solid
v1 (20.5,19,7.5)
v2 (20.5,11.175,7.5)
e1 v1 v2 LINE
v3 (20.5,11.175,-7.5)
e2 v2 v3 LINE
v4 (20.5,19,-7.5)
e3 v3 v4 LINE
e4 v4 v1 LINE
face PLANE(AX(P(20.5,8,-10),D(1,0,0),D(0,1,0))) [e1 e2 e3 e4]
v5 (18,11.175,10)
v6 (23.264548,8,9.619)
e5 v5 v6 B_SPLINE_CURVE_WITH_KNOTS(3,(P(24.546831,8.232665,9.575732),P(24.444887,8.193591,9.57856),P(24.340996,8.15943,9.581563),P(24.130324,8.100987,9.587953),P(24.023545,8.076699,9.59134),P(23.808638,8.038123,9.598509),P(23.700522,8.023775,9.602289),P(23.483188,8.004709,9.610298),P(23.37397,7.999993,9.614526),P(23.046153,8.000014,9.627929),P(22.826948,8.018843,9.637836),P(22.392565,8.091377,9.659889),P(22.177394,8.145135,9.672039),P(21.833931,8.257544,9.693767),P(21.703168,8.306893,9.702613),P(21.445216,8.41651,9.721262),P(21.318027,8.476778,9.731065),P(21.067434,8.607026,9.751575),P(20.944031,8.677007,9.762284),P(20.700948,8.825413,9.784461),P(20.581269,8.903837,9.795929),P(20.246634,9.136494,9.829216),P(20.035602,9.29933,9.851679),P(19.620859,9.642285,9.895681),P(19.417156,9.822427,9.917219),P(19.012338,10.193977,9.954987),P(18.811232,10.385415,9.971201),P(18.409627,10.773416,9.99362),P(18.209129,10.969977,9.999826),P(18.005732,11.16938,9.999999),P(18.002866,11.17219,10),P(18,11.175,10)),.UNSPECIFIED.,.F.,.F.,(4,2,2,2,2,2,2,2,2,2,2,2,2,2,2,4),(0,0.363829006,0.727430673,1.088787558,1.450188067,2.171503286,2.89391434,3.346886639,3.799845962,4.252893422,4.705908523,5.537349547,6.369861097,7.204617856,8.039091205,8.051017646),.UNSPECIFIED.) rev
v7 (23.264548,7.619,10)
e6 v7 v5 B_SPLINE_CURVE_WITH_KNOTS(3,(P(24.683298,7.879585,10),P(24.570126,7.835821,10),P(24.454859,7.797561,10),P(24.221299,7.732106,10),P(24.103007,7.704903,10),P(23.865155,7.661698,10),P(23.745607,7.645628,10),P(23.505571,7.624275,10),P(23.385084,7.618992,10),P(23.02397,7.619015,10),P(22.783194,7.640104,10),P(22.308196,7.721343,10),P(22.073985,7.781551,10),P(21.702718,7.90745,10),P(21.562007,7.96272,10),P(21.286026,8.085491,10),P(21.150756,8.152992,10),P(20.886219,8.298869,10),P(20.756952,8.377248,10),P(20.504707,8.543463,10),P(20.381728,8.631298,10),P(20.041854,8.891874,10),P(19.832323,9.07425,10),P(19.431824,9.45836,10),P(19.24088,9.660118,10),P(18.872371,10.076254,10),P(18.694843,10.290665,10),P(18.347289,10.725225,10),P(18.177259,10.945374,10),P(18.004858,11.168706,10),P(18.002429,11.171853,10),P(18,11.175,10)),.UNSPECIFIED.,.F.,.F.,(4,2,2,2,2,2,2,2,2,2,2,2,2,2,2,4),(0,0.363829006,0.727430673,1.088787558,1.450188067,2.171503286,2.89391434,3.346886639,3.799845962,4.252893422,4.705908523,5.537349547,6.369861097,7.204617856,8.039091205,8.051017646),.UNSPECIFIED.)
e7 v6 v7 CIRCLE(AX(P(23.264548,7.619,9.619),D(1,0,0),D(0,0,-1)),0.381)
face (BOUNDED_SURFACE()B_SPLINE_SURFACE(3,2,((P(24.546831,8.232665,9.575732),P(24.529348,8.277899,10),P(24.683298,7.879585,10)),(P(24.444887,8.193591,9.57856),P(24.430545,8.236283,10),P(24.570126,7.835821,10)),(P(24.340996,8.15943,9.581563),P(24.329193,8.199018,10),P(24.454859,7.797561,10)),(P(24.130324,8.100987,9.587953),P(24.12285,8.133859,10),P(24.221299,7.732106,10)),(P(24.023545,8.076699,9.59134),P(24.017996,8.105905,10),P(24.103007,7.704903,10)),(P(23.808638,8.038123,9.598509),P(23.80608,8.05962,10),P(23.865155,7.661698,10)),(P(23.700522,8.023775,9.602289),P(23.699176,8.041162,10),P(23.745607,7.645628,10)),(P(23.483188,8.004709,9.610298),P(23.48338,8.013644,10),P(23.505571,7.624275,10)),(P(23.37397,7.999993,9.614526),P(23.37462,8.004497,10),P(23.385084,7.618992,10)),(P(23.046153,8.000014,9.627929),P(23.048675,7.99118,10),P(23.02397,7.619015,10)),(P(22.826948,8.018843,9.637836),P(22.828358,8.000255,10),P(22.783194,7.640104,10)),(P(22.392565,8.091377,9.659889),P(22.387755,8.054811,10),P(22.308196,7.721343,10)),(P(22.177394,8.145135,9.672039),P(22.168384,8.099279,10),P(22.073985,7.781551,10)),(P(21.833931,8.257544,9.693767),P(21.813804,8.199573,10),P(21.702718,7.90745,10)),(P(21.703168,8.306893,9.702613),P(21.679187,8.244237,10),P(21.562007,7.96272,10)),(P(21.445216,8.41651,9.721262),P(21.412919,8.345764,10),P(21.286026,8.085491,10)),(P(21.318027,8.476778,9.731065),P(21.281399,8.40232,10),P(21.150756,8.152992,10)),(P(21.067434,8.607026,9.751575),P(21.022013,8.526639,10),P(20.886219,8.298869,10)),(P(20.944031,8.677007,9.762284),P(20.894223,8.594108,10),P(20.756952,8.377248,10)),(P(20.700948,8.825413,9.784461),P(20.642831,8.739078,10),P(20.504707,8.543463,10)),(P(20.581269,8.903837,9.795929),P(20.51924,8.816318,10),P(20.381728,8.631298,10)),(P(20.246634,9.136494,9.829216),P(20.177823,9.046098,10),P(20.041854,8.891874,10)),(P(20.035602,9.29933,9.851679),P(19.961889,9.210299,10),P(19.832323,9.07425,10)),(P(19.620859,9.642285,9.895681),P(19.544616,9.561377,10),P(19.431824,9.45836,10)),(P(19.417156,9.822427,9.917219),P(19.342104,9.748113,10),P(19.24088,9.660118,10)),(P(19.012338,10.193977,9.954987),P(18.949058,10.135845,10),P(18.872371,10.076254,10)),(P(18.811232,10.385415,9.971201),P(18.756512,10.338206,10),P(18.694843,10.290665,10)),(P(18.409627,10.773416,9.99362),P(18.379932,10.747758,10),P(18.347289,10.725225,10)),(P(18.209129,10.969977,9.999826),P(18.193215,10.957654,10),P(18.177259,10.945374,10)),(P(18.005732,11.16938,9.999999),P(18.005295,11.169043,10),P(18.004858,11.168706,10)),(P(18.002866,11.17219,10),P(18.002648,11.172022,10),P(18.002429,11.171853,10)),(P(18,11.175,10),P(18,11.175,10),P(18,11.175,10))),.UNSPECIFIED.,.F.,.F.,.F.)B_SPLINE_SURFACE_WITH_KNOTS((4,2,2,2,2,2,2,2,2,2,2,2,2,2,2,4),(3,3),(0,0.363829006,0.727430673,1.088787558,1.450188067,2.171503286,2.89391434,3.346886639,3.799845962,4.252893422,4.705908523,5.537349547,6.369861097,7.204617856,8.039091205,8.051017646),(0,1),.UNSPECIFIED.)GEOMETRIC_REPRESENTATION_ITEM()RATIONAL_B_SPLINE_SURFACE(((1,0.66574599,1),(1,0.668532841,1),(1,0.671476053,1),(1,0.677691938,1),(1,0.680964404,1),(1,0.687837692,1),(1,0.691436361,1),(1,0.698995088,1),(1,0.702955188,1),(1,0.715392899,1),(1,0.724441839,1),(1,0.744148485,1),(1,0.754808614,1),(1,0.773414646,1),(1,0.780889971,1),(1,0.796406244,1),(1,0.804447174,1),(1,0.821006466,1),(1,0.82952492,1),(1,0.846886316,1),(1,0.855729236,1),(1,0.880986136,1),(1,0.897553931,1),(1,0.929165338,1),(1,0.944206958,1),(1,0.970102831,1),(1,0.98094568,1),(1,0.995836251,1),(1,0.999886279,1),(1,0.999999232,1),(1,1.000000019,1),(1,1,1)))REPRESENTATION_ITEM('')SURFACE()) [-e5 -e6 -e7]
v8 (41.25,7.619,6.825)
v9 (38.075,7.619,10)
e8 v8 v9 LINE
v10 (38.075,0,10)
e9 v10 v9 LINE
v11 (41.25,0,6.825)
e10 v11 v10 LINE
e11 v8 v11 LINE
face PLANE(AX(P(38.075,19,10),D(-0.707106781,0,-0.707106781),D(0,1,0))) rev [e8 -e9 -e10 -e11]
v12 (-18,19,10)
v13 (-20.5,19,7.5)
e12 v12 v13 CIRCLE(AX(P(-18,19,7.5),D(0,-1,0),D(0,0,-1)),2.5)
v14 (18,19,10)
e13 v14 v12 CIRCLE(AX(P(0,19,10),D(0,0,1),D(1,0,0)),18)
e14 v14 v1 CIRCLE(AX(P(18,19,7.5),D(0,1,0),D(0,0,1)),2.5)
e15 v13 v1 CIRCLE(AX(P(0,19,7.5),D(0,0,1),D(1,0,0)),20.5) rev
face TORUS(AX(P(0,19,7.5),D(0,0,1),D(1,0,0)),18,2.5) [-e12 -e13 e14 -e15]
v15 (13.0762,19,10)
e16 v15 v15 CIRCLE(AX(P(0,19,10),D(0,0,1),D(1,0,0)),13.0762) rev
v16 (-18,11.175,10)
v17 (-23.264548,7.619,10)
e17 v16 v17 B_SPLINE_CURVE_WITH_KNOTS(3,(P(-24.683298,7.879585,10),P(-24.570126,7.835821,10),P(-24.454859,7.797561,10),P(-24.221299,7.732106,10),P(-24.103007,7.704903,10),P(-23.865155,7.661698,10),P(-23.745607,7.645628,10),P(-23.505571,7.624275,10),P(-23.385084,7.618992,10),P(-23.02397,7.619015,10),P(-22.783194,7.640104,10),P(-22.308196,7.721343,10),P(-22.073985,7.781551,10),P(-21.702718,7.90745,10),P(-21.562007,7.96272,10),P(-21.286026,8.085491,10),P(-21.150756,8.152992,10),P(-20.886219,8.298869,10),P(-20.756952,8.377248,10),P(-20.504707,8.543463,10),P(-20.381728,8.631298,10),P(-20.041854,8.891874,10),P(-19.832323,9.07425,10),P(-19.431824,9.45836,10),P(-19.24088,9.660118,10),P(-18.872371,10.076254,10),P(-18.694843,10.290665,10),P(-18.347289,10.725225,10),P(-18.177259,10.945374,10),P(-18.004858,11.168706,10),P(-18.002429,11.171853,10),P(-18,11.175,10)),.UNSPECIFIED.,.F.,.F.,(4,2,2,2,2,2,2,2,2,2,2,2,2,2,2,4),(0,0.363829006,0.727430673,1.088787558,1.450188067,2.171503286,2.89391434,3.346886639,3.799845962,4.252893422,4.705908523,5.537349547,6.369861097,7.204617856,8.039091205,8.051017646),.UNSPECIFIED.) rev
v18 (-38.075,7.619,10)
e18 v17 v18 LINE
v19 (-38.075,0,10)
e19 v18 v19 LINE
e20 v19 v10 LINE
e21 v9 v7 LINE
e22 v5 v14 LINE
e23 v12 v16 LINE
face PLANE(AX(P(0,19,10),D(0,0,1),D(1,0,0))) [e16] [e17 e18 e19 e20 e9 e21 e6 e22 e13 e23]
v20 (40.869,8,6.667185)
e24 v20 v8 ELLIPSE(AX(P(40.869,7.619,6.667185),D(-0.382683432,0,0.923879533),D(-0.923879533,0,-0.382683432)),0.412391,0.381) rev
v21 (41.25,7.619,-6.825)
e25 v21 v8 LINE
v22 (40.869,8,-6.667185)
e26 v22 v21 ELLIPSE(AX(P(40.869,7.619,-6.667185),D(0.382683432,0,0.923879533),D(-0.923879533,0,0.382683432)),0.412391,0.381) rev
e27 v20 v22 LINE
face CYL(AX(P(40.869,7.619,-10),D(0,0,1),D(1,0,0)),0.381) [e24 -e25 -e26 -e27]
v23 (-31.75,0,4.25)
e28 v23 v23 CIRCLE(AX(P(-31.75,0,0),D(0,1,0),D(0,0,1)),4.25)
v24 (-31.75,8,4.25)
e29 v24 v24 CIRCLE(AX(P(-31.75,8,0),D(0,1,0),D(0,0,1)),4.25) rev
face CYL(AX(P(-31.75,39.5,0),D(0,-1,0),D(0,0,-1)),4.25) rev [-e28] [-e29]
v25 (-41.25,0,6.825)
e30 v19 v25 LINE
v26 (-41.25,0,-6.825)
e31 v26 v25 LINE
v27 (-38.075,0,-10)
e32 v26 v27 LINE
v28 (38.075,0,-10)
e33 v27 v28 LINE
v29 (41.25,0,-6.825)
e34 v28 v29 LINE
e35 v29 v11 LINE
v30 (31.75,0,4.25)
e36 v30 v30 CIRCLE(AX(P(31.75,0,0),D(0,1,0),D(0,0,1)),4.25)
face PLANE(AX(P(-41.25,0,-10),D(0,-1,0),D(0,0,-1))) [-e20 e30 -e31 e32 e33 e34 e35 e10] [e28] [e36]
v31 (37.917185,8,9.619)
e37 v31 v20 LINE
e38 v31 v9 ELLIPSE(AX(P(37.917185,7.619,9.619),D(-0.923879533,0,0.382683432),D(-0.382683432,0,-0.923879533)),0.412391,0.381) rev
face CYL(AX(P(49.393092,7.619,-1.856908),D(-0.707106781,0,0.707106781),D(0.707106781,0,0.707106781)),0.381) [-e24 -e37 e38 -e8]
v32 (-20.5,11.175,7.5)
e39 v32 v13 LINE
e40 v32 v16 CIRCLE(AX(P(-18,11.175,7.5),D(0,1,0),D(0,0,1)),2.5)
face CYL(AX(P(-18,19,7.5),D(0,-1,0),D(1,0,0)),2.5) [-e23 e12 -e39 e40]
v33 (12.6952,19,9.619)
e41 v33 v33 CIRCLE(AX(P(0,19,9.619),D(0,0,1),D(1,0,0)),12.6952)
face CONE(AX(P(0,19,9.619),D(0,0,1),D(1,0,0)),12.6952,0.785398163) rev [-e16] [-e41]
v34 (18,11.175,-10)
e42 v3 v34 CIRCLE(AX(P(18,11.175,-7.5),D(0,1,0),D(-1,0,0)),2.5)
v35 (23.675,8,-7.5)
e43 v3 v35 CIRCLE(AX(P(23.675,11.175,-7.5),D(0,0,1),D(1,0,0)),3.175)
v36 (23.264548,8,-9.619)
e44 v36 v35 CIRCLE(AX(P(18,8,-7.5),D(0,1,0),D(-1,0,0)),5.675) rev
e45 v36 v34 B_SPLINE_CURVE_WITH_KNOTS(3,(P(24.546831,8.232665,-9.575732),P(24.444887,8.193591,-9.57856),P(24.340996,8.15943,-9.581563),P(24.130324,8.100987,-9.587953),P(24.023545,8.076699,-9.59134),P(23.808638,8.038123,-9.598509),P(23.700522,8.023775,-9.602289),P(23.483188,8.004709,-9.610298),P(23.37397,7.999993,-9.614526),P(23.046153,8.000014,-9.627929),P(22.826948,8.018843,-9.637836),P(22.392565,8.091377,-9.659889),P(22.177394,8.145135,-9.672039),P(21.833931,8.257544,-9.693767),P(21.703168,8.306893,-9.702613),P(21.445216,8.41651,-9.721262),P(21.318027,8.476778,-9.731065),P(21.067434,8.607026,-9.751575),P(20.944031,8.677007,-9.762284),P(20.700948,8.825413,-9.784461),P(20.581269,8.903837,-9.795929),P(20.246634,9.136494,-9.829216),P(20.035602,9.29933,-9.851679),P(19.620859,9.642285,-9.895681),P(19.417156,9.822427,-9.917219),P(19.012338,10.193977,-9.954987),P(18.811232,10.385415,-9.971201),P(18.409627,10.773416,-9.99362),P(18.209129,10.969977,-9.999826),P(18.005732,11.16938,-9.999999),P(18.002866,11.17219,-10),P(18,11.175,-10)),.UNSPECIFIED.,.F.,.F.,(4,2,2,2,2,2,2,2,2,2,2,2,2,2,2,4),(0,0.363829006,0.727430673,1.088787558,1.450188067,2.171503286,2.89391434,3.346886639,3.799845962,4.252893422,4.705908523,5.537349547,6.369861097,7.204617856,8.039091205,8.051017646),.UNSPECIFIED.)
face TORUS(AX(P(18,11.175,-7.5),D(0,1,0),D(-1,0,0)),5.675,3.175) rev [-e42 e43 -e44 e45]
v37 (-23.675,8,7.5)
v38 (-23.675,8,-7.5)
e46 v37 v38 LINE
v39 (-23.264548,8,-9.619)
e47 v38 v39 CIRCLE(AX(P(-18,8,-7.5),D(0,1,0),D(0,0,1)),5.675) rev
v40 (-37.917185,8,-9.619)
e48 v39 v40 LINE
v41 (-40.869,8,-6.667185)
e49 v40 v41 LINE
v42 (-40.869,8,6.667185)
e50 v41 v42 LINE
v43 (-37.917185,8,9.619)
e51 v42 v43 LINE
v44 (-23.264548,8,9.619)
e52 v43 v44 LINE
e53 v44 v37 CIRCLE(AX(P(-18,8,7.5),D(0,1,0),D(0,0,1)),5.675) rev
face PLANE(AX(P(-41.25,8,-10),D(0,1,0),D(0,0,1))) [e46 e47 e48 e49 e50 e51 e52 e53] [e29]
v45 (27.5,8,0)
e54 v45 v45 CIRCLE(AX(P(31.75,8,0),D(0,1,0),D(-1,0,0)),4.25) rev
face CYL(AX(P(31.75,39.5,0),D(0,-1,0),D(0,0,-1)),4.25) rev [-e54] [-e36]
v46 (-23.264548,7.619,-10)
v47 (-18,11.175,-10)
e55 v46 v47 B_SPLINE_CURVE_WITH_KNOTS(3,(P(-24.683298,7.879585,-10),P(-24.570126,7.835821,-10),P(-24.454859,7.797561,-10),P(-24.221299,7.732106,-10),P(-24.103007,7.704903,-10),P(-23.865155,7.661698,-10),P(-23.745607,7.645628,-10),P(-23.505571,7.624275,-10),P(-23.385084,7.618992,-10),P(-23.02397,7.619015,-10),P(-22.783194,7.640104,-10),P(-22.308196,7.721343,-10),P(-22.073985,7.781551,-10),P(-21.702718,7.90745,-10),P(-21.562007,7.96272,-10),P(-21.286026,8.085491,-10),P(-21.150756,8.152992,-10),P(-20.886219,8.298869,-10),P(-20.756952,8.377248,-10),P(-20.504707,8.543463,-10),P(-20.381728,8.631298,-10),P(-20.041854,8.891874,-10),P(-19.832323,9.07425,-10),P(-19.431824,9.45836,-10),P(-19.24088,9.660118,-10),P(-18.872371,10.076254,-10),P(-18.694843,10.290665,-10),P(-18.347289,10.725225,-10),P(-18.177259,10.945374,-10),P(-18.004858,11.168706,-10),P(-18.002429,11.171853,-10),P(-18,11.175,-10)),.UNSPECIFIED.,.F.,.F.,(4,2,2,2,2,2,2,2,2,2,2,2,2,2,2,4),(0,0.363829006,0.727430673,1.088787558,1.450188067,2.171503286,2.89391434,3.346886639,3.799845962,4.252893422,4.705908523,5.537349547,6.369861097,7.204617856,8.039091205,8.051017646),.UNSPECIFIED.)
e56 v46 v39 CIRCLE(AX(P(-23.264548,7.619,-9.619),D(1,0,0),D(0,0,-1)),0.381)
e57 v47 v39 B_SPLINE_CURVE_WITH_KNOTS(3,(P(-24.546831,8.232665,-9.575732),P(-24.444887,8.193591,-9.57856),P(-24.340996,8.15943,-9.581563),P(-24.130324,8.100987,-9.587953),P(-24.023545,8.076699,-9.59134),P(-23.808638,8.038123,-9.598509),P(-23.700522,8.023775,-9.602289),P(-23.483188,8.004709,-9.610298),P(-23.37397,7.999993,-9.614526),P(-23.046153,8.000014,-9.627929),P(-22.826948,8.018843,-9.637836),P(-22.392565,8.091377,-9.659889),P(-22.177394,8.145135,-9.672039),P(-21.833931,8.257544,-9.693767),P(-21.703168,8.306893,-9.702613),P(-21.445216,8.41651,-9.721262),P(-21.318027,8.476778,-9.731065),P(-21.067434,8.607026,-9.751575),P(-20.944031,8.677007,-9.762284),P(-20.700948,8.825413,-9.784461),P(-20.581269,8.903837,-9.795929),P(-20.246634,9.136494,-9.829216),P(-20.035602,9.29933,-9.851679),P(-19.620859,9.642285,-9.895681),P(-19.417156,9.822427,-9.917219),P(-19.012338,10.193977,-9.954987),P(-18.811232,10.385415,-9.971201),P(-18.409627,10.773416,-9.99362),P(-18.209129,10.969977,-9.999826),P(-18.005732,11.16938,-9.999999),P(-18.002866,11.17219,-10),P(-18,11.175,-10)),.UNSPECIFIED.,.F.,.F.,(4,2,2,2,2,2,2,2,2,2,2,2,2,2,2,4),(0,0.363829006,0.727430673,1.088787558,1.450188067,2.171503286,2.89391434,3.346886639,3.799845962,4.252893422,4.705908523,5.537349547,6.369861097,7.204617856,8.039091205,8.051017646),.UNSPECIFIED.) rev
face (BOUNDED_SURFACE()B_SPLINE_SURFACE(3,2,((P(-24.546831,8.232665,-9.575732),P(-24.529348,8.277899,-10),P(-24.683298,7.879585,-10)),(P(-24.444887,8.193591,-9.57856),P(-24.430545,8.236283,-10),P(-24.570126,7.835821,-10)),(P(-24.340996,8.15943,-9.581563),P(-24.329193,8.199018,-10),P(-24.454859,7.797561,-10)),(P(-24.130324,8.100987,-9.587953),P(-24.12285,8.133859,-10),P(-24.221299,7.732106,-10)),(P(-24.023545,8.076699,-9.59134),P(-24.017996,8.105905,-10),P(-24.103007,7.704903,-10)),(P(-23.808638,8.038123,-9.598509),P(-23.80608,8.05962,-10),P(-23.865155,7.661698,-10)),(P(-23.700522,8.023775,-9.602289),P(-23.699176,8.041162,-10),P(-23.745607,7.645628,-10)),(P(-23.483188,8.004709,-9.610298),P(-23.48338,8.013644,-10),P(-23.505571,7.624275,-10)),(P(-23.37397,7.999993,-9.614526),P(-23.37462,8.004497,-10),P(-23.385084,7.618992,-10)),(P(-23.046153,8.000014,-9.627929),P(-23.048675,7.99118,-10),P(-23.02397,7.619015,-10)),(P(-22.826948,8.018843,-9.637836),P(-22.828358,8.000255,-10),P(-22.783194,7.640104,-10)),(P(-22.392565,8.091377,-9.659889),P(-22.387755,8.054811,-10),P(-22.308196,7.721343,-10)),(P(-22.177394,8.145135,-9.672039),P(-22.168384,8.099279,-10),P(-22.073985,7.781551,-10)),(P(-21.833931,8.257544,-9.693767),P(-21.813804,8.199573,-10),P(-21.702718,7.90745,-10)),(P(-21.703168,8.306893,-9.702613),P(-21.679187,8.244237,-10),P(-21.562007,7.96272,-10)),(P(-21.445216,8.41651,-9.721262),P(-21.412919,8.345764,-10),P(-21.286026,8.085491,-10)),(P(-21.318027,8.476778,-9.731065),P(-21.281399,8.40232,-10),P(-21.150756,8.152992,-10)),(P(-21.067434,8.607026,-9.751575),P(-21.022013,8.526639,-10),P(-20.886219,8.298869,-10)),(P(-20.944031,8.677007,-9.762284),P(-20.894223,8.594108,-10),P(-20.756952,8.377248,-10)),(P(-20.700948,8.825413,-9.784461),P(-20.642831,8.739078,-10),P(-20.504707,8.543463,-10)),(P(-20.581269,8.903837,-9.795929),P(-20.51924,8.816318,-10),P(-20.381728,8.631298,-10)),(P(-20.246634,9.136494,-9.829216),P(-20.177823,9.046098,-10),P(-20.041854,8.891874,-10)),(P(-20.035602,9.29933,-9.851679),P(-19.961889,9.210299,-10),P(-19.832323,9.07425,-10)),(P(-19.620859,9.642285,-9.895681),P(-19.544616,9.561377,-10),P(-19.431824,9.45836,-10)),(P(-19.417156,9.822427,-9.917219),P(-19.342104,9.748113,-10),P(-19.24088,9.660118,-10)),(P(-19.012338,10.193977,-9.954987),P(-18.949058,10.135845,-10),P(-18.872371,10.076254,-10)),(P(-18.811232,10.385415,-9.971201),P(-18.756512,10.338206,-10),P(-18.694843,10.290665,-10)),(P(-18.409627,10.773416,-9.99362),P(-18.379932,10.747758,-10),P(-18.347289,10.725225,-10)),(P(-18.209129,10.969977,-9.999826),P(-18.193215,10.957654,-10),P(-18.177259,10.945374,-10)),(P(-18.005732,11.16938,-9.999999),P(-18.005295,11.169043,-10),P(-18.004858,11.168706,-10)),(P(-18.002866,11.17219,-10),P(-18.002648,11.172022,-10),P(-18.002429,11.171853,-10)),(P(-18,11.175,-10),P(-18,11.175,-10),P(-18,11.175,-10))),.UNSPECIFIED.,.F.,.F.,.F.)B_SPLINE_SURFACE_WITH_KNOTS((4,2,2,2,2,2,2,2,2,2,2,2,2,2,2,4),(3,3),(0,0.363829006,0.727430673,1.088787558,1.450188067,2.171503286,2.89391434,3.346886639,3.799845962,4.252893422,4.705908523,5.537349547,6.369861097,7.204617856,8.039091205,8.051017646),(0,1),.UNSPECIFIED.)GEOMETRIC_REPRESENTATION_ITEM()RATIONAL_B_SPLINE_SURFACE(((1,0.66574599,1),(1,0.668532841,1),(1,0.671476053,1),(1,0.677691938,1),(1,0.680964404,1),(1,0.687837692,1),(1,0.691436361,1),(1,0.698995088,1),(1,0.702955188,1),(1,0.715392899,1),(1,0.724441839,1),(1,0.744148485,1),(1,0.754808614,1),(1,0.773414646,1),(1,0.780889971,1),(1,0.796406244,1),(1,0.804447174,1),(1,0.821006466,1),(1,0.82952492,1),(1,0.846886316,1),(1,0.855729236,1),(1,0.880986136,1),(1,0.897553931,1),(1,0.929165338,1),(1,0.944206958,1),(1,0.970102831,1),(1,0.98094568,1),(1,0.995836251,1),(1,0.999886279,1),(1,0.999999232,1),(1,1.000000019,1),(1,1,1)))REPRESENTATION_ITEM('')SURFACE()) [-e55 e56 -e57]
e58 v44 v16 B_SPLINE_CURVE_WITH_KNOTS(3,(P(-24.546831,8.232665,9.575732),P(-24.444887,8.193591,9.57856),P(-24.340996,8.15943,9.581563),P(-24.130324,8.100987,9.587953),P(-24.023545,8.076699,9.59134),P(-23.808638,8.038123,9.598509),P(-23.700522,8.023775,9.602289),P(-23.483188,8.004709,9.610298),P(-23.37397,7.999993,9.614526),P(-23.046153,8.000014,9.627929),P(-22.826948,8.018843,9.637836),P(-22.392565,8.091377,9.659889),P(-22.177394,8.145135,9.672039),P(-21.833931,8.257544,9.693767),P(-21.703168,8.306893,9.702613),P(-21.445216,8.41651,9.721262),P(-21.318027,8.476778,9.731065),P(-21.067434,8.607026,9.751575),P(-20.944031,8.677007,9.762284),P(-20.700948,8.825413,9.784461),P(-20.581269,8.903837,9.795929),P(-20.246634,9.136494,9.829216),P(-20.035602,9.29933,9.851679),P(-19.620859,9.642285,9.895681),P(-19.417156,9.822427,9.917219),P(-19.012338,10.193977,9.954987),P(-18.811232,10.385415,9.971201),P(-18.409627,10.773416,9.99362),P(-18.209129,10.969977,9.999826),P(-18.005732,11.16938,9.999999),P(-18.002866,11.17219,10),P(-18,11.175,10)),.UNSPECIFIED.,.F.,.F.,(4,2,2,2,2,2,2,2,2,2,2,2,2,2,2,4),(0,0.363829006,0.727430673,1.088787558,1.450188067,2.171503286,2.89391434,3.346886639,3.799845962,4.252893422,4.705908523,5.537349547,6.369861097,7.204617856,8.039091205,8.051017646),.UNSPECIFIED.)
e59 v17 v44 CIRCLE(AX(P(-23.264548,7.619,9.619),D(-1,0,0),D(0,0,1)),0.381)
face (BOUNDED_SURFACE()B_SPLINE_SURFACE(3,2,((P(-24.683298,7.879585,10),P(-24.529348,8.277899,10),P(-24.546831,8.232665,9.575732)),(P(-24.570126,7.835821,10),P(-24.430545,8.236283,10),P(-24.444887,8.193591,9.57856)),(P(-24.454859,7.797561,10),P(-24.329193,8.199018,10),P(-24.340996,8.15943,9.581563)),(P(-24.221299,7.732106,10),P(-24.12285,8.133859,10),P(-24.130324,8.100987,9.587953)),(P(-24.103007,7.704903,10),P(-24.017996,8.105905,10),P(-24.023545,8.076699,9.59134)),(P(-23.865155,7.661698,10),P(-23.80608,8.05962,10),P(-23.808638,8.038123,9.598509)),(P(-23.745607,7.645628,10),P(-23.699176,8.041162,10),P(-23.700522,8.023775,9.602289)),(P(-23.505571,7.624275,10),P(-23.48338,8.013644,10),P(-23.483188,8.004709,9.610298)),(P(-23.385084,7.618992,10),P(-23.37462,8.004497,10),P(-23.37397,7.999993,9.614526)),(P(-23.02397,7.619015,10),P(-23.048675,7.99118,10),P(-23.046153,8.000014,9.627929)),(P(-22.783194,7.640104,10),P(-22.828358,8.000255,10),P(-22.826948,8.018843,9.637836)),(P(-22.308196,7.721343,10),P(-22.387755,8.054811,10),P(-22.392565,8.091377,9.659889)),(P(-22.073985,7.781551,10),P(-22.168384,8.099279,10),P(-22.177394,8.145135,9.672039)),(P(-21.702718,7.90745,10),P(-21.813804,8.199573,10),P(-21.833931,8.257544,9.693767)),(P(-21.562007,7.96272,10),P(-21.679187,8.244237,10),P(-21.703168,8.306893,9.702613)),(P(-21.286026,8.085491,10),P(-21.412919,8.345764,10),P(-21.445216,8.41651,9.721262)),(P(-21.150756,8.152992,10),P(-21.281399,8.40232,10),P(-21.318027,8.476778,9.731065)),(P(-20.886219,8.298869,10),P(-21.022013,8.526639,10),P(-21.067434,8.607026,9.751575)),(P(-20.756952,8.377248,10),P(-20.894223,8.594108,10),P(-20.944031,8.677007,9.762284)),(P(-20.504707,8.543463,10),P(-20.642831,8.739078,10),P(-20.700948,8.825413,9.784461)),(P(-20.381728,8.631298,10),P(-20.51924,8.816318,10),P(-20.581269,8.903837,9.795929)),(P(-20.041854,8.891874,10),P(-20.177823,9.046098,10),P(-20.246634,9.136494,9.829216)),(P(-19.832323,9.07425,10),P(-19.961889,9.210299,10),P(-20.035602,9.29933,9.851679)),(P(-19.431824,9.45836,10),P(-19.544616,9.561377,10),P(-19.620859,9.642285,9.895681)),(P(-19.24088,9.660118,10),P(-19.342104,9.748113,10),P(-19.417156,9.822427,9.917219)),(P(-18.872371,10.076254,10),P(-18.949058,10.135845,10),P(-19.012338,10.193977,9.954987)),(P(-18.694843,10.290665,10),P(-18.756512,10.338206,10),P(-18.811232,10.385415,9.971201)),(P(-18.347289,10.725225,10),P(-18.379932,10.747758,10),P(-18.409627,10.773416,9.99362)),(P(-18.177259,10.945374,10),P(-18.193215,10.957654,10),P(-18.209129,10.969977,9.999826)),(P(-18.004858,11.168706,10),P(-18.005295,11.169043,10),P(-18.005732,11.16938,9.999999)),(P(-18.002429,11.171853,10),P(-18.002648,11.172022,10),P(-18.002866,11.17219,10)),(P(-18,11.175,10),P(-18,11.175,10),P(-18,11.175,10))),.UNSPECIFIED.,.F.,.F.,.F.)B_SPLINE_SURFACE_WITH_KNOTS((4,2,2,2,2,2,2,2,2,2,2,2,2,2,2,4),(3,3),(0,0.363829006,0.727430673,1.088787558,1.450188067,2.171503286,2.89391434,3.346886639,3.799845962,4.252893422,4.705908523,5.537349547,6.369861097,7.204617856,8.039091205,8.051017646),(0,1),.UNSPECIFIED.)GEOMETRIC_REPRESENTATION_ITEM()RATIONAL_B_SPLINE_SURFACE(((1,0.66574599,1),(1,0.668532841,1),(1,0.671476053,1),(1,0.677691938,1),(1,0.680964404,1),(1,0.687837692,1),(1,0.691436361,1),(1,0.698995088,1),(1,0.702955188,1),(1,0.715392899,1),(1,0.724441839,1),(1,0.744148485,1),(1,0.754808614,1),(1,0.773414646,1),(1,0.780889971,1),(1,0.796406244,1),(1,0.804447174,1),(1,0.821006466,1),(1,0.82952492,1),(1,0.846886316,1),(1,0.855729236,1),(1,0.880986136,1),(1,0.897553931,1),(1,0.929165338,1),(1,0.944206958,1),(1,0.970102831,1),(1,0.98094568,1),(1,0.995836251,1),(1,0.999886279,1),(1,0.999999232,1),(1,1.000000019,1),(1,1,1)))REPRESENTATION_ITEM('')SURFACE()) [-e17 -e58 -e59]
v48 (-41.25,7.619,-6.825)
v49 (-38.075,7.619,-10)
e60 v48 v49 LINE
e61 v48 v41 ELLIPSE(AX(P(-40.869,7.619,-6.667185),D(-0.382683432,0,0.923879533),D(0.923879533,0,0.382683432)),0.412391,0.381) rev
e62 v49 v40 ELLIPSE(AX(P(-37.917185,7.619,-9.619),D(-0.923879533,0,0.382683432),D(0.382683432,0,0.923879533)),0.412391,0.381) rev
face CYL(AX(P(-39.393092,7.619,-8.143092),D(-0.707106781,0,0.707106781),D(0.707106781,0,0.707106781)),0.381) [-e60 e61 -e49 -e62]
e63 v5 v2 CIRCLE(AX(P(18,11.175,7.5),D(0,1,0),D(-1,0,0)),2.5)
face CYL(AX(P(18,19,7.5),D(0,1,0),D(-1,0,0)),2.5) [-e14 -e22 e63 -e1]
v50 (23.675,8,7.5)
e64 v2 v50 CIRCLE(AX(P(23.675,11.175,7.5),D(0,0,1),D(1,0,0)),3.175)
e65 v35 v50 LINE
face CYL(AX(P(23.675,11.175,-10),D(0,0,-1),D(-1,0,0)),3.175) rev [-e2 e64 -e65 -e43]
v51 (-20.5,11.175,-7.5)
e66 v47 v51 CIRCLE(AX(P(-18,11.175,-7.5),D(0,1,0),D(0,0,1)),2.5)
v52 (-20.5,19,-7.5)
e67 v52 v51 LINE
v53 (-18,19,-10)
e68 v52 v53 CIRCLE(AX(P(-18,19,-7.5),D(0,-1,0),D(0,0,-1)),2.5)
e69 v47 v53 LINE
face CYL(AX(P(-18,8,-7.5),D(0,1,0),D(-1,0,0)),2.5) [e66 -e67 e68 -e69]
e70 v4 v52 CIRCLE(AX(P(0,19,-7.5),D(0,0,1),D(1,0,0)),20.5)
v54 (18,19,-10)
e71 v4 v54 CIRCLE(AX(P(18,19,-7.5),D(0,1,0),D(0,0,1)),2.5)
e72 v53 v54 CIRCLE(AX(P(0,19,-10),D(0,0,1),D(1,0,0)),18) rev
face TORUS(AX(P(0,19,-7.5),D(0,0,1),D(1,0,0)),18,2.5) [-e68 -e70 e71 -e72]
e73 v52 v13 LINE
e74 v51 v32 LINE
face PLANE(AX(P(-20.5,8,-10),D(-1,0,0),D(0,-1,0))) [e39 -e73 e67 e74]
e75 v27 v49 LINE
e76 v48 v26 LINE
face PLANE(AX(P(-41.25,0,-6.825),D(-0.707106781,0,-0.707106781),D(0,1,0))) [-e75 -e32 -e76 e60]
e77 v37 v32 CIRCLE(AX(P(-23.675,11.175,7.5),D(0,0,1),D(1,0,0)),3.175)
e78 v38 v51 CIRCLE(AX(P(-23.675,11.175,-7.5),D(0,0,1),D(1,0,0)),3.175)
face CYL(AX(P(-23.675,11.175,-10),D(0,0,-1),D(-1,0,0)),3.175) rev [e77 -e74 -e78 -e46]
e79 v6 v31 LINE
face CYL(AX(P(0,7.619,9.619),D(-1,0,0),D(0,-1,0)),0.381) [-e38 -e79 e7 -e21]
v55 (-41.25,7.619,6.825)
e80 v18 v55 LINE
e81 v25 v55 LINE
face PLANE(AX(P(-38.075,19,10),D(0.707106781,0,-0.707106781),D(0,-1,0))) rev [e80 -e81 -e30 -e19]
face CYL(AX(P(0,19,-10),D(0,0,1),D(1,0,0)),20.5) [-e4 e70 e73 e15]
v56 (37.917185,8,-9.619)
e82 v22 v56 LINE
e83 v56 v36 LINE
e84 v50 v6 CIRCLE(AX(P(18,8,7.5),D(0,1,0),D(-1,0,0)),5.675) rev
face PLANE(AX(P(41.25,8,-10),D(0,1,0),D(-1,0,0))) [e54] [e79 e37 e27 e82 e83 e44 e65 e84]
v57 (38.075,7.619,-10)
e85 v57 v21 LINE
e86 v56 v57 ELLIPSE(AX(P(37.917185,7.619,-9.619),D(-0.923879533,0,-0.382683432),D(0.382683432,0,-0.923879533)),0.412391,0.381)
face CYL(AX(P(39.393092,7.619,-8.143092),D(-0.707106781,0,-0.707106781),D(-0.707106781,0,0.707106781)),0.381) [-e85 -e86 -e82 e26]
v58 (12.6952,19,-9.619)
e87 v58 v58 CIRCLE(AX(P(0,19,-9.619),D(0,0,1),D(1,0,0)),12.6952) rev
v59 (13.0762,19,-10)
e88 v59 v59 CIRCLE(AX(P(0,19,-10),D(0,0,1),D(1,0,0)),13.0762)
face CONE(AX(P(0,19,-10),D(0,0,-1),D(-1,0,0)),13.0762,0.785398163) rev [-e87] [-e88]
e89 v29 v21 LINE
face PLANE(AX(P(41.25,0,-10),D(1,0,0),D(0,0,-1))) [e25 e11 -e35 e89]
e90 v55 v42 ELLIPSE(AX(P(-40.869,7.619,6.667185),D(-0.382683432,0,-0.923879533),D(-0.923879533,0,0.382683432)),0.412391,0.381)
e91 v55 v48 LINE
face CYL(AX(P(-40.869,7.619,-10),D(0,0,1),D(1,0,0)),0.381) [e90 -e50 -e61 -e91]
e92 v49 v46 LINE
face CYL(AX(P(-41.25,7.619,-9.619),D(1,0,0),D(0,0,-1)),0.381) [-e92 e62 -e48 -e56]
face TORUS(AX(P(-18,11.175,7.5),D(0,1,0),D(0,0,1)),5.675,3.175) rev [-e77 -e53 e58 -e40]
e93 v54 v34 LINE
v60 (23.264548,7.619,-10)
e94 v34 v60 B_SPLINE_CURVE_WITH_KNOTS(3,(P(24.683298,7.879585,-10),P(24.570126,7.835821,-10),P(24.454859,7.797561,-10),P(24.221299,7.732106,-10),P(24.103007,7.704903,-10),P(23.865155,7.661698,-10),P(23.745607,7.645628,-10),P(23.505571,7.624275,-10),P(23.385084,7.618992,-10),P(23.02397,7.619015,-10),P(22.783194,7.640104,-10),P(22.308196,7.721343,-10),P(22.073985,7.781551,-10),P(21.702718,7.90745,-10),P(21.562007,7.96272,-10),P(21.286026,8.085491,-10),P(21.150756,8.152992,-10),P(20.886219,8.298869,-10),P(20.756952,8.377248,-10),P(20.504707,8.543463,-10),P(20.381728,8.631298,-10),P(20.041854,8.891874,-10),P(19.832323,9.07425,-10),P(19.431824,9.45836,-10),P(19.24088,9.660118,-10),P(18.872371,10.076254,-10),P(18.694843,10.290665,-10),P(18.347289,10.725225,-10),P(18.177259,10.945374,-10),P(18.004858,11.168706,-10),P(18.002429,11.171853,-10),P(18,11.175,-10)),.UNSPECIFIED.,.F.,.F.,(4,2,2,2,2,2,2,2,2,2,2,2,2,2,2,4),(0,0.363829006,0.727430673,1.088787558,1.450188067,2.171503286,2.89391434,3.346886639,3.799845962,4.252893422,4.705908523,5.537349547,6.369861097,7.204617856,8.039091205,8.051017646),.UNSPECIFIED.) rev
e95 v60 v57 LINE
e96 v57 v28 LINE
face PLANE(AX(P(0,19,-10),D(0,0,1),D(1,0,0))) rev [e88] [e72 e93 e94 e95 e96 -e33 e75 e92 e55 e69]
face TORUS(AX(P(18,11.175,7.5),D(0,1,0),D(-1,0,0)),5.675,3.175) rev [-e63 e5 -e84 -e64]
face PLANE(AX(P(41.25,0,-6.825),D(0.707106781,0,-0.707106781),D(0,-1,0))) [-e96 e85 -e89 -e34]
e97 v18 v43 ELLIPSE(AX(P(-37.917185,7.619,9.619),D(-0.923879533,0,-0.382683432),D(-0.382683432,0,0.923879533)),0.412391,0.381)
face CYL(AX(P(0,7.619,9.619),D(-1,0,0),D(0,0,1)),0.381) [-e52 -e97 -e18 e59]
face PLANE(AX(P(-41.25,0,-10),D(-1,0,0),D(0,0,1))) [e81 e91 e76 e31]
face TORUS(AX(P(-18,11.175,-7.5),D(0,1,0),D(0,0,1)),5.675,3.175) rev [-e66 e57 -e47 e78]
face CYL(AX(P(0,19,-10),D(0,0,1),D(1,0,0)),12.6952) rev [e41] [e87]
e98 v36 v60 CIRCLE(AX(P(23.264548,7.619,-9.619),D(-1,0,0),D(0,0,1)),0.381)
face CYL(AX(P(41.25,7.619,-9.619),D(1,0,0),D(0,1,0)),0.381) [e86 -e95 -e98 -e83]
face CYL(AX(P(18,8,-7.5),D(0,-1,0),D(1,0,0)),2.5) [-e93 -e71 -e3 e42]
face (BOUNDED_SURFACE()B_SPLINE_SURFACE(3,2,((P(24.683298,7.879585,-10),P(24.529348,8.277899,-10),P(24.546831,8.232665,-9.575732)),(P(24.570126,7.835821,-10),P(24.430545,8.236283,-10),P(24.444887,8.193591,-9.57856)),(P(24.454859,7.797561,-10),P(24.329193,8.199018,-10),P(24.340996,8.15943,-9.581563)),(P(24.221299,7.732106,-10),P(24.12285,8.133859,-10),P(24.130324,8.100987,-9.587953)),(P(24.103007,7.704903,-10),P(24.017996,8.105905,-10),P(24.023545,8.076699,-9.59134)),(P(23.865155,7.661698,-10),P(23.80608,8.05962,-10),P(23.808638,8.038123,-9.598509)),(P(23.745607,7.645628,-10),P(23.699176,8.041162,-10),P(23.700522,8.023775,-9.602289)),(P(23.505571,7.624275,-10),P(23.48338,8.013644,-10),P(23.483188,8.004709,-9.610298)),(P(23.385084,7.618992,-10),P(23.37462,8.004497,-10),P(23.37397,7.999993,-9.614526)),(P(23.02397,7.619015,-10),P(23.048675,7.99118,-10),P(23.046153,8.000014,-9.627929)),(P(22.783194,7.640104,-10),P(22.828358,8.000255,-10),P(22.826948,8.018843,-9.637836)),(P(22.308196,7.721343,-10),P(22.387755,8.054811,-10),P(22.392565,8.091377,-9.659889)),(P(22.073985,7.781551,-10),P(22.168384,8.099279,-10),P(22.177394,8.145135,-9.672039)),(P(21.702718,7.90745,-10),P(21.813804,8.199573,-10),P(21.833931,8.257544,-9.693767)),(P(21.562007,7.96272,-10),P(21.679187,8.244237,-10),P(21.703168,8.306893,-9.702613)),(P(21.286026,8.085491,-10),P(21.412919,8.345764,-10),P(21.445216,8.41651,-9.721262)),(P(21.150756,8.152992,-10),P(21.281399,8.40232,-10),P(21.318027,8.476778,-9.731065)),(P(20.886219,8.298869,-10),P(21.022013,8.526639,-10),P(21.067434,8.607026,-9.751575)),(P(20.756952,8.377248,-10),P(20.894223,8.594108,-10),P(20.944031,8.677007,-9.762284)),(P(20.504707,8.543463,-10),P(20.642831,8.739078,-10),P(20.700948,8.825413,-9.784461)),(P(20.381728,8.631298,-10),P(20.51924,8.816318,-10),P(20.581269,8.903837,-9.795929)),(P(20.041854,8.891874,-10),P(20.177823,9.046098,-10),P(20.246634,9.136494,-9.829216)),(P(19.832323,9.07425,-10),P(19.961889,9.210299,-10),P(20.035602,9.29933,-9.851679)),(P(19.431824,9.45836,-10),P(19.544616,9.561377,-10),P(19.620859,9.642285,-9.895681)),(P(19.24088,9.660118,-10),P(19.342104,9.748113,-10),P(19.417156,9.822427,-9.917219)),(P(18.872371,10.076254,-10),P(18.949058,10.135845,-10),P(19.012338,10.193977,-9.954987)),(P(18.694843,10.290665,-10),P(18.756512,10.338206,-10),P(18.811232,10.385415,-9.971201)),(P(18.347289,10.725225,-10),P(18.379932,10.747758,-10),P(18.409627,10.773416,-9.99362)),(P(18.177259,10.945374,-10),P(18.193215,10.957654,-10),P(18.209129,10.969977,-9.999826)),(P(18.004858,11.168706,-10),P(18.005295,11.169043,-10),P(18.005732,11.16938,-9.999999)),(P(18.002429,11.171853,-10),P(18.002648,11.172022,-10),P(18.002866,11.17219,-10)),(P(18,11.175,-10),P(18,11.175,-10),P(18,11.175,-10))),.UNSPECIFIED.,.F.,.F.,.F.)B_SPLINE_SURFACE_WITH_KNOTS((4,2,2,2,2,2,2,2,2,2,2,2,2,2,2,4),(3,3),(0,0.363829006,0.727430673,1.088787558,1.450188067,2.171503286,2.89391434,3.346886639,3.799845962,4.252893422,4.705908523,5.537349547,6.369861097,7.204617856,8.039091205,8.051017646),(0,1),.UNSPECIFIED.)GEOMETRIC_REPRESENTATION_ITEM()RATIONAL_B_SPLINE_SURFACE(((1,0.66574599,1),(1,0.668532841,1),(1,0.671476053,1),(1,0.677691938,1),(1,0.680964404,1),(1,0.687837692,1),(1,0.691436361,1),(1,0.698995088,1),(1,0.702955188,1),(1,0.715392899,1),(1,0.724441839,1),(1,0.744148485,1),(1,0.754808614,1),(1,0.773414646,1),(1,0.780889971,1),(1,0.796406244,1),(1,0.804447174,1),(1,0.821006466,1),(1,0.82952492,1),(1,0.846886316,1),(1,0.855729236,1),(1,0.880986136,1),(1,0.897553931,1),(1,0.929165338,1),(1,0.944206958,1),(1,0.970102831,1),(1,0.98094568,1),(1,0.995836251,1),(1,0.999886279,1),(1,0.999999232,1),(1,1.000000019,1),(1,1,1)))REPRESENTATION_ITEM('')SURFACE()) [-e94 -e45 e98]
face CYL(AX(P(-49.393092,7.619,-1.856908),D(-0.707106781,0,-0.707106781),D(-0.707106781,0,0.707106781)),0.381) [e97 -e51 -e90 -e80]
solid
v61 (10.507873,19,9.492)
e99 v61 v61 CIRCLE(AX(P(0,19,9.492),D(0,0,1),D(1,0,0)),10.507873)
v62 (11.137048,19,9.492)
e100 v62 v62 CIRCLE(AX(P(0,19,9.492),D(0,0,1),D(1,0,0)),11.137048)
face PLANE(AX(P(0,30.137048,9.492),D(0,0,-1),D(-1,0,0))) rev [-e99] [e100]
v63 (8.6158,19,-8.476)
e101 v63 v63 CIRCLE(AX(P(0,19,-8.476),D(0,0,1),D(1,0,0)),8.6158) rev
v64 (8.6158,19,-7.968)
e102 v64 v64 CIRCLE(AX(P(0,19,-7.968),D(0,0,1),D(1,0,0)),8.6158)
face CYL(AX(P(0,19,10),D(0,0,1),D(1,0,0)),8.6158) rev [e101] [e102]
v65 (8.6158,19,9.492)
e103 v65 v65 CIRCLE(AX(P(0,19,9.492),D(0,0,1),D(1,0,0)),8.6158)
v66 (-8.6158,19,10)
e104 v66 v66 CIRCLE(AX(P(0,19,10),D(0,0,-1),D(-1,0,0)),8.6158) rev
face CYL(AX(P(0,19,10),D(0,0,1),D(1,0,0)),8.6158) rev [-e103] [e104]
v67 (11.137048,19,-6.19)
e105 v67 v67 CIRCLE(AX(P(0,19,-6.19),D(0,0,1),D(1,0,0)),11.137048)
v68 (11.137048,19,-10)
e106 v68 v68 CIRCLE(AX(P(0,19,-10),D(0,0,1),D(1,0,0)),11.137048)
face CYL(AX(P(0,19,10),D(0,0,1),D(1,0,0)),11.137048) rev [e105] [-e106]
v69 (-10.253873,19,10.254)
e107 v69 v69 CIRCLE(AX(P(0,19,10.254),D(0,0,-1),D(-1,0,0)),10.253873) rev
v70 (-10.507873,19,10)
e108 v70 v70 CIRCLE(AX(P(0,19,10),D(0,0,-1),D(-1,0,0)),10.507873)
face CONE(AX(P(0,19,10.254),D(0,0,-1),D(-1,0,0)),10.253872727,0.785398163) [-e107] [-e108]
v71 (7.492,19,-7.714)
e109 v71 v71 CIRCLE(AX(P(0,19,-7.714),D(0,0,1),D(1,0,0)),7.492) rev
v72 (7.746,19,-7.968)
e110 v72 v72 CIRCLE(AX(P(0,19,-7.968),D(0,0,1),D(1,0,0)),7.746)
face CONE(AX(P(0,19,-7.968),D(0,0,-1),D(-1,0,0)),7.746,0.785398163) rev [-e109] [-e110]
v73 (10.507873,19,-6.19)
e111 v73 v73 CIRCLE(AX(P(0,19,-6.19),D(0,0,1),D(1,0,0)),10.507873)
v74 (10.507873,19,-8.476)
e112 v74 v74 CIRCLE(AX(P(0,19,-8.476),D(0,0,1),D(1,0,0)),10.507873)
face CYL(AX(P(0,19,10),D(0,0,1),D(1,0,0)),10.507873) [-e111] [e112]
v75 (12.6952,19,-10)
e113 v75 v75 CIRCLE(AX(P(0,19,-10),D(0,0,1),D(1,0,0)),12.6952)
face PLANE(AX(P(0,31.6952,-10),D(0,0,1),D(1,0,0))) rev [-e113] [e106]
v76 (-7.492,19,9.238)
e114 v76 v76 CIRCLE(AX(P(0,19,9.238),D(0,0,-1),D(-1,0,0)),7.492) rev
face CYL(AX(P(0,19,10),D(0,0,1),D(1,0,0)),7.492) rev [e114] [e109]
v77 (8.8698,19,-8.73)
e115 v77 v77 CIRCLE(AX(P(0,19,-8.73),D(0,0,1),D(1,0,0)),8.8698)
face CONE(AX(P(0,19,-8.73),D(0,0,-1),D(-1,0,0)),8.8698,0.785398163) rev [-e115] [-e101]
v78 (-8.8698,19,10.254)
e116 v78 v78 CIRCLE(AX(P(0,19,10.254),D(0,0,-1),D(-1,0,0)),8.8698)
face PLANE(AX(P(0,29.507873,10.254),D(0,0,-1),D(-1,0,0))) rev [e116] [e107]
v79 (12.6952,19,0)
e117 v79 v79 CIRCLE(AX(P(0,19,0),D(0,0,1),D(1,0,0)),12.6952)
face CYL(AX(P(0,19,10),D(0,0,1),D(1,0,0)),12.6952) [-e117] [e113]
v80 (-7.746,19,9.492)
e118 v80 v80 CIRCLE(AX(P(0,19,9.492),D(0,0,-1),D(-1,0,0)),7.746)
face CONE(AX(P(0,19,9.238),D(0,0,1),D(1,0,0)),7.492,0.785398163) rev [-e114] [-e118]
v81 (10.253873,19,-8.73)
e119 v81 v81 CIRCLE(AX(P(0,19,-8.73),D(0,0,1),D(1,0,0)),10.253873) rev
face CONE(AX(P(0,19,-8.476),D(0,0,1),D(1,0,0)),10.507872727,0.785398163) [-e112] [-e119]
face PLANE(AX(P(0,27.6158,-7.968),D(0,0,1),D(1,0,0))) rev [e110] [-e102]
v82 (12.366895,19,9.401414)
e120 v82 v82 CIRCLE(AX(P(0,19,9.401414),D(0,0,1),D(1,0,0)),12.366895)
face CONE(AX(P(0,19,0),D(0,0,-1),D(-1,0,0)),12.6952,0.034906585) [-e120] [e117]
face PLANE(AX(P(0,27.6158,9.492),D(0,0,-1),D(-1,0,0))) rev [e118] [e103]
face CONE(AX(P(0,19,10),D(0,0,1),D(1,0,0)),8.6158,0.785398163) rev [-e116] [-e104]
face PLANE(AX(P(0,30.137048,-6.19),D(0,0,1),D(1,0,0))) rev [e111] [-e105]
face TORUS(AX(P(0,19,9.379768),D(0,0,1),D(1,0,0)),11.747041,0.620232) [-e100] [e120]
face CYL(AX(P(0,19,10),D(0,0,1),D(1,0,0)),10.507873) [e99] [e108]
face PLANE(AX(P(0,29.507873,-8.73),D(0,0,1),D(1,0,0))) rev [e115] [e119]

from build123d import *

# Parameters (mm, degrees)
BOSS_EXTRUDE1_DEPTH      = 10
BOSS_EXTRUDE1_DEPTH_BACK = 10
SKETCH3_R                = 12.6952
SKETCH4_R                = 4.25
CUT_EXTRUDE1_DEPTH       = 58.981139175
CHAMFER1_SIZE            = 3.175
FILLET1_R                = 2.5
FILLET2_R                = 3.175
CHAMFER2_SIZE            = 0.381
FILLET3_R                = 0.381
CHAMFER3_SIZE            = 0.254


with BuildPart() as part:
    # Sketch3 → Boss-Extrude1 (new, two sides: drawn at the far end of the back side and taken through both)
    with BuildSketch(Plane.XY.offset(-BOSS_EXTRUDE1_DEPTH_BACK)):
        with BuildLine():
            Line((-41.25, 0), (-41.25, 8))
            Line((-41.25, 8), (-20.5, 8))
            Line((-20.5, 8), (-20.5, 19))
            ThreePointArc((-20.5, 19), (0, 39.5), (20.5, 19))
            Line((20.5, 19), (20.5, 8))
            Line((20.5, 8), (41.25, 8))
            Line((41.25, 8), (41.25, 0))
            Line((41.25, 0), (-41.25, 0))
        make_face()
        with Locations((0, 19)):
            Circle(SKETCH3_R, mode=Mode.SUBTRACT)
    extrude(amount=BOSS_EXTRUDE1_DEPTH + BOSS_EXTRUDE1_DEPTH_BACK)

    # Sketch4 → Cut-Extrude1 (cut, through all)
    with BuildSketch(Plane(origin=(0, 0, 0), x_dir=(1, 0, 0), z_dir=(0, 1, 0))):
        with Locations(Location((-31.75, 0, 0), (0, 0, 270))):
            Circle(SKETCH4_R)
        with Locations(Location((31.75, 0, 0), (0, 0, 180))):
            Circle(SKETCH4_R)
    extrude(amount=CUT_EXTRUDE1_DEPTH, mode=Mode.SUBTRACT)

    # Chamfer1
    chamfer1_edges = [part.edges().sort_by_distance(p)[0] for p in [
        (41.25, 4, 10),
        (-41.25, 4, -10),
        (-41.25, 4, 10),
        (41.25, 4, -10),
    ]]
    chamfer(chamfer1_edges, length=CHAMFER1_SIZE)

    # Fillet1
    fillet1_edges = [part.edges().sort_by_distance(p)[0] for p in [
        (20.5, 13.5, -10),
        (0, 39.5, -10),
        (-20.5, 13.5, -10),
        (20.5, 13.5, 10),
        (0, 39.5, 10),
        (-20.5, 13.5, 10),
    ]]
    fillet(fillet1_edges, radius=FILLET1_R)

    # Fillet2
    # the kernel refuses this fillet: 3.175 mm, written as the material it adds along each edge
    with BuildSketch(Plane(origin=(-20.5, 8, 7.5), x_dir=(-1, 0, 0), z_dir=(0, 0, -1))) as fillet2_piece_1:
        with BuildLine():
            CenterArc((FILLET2_R, FILLET2_R), FILLET2_R, 180, 90)
            Line((0, FILLET2_R), (0, 0))
            Line((0, 0), (FILLET2_R, 0))
        make_face()
    extrude(amount=15)
    with BuildSketch(Plane(origin=(20.5, 8, 7.5), x_dir=(1, 0, 0), z_dir=(0, 0, -1))) as fillet2_piece_2:
        with BuildLine():
            CenterArc((FILLET2_R, -FILLET2_R), FILLET2_R, 90, 90)
            Line((0, -FILLET2_R), (0, 0))
            Line((0, 0), (FILLET2_R, 0))
        make_face()
    extrude(amount=15)
    with BuildSketch(Plane(origin=(-18, 8, -7.5), x_dir=(-0.03467581693539278, 0, 0.9993986130267857), z_dir=(-0.9993986130267857, 0, -0.03467581693539278))) as fillet2_piece_3_section:
        with BuildLine():
            CenterArc((-2.5 - FILLET2_R, FILLET2_R), FILLET2_R, 270, 90)
            Line((-2.5, FILLET2_R), (-2.5, 0))
            Line((-2.5, 0), (-2.5 - FILLET2_R, 0))
        make_face()
    fillet2_piece_3 = revolve(axis=Axis((-18, 8, -7.5), (0, 1, 0)), revolution_arc=271.987176332, mode=Mode.PRIVATE)
    fillet2_piece_3 = split(fillet2_piece_3, bisect_by=Plane(origin=(-19.885490697, 9.038383222, -10), z_dir=(0, 0, 1)), keep=Keep.TOP, mode=Mode.PRIVATE)
    add(fillet2_piece_3)
    with BuildSketch(Plane(origin=(-18, 8, 7.5), x_dir=(-0.03467581693539278, 0, -0.9993986130267857), z_dir=(-0.9993986130267857, 0, 0.03467581693539278))) as fillet2_piece_4_section:
        with BuildLine():
            CenterArc((-2.5 - FILLET2_R, -FILLET2_R), FILLET2_R, 0, 90)
            Line((-2.5, -FILLET2_R), (-2.5, 0))
            Line((-2.5, 0), (-2.5 - FILLET2_R, 0))
        make_face()
    fillet2_piece_4 = revolve(axis=Axis((-18, 8, 7.5), (0, -1, 0)), revolution_arc=271.987176332, mode=Mode.PRIVATE)
    fillet2_piece_4 = split(fillet2_piece_4, bisect_by=Plane(origin=(-19.885490697, 9.038383222, 10), z_dir=(0, 0, -1)), keep=Keep.TOP, mode=Mode.PRIVATE)
    add(fillet2_piece_4)
    with BuildSketch(Plane(origin=(18, 8, -7.5), x_dir=(0.034675816935389944, 0, 0.9993986130267859), z_dir=(0.9993986130267859, 0, -0.034675816935389944))) as fillet2_piece_5_section:
        with BuildLine():
            CenterArc((-2.5 - FILLET2_R, -FILLET2_R), FILLET2_R, 0, 90)
            Line((-2.5, -FILLET2_R), (-2.5, 0))
            Line((-2.5, 0), (-2.5 - FILLET2_R, 0))
        make_face()
    fillet2_piece_5 = revolve(axis=Axis((18, 8, -7.5), (0, -1, 0)), revolution_arc=271.987176332, mode=Mode.PRIVATE)
    fillet2_piece_5 = split(fillet2_piece_5, bisect_by=Plane(origin=(19.885490637, 9.038383433, -10), z_dir=(0, 0, 1)), keep=Keep.TOP, mode=Mode.PRIVATE)
    add(fillet2_piece_5)
    with BuildSketch(Plane(origin=(18, 8, 7.5), x_dir=(0.034675816935389944, 0, -0.9993986130267859), z_dir=(0.9993986130267859, 0, 0.034675816935389944))) as fillet2_piece_6_section:
        with BuildLine():
            CenterArc((-2.5 - FILLET2_R, FILLET2_R), FILLET2_R, 270, 90)
            Line((-2.5, FILLET2_R), (-2.5, 0))
            Line((-2.5, 0), (-2.5 - FILLET2_R, 0))
        make_face()
    fillet2_piece_6 = revolve(axis=Axis((18, 8, 7.5), (0, 1, 0)), revolution_arc=271.987176332, mode=Mode.PRIVATE)
    fillet2_piece_6 = split(fillet2_piece_6, bisect_by=Plane(origin=(19.885490637, 9.038383433, 10), z_dir=(0, 0, -1)), keep=Keep.TOP, mode=Mode.PRIVATE)
    add(fillet2_piece_6)

    # Chamfer2
    chamfer2_edges = [part.edges().sort_by_distance(p)[0] for p in [
        (-12.6952, 19, -10),
        (-12.6952, 19, 10),
    ]]
    chamfer(chamfer2_edges, length=CHAMFER2_SIZE)

    # Fillet3
    fillet3_edges = [part.edges().sort_by_distance(p)[0] for p in [
        (-30.584833164, 8, -10),
        (-30.584833164, 8, 10),
        (-20.219976999, 9.019948151, -10),
        (-20.219976999, 9.019948151, 10),
        (20.219976999, 9.019948151, -10),
        (20.219976999, 9.019948151, 10),
        (-41.25, 8, 0),
        (30.584833164, 8, -10),
        (-39.6625, 8, 8.4125),
        (-39.6625, 8, -8.4125),
        (30.584833164, 8, 10),
        (41.25, 8, 0),
        (39.6625, 8, -8.4125),
        (39.6625, 8, 8.4125),
    ]]
    fillet(fillet3_edges, radius=FILLET3_R)


with BuildPart() as body_2:
    # Sketch6 → Revolve1 (revolve)
    with BuildSketch(Plane(origin=(0, 0, 0), x_dir=(0, 0, -1), z_dir=(1, 0, 0)), mode=Mode.PRIVATE) as revolve1_sk:
        with BuildLine():
            Line((0, 31.6952), (10, 31.6952))
            Line((10, 31.6952), (10, 30.137048122))
            Line((10, 30.137048122), (6.19, 30.137048122))
            Line((6.19, 30.137048122), (6.19, 29.507872727))
            Line((6.19, 29.507872727), (8.73, 29.507872727))
            Line((8.73, 29.507872727), (8.73, 27.6158))
            Line((8.73, 27.6158), (7.968, 27.6158))
            Line((7.968, 27.6158), (7.968, 26.492))
            Line((7.968, 26.492), (-9.492, 26.492))
            Line((-9.492, 26.492), (-9.492, 27.6158))
            Line((-9.492, 27.6158), (-10.254, 27.6158))
            Line((-10.254, 27.6158), (-10.254, 29.507872727))
            Line((-10.254, 29.507872727), (-9.492, 29.507872727))
            Line((-9.492, 29.507872727), (-9.492, 30.137048122))
            ThreePointArc((-9.492, 30.137048122), (-9.998324352, 30.792601929), (-9.40141384, 31.366895394))
            Line((-9.40141384, 31.366895394), (0, 31.6952))
        make_face()
    revolve(revolve1_sk.sketch.rotate(Axis((0, 19, 10), (0, 0, -1)), 90), axis=Axis((0, 19, 10), (0, 0, -1)))

    # Chamfer3
    chamfer3_edges = [body_2.edges().sort_by_distance(p)[0] for p in [
        (-10.507872727, 19, -8.73),
        (-8.6158, 19, -8.73),
        (-7.492, 19, -7.968),
        (-7.492, 19, 9.492),
        (-8.6158, 19, 10.254),
        (-10.507872727, 19, 10.254),
    ]]
    chamfer(chamfer3_edges, length=CHAMFER3_SIZE)


solid = Compound([part.part, body_2.part])
